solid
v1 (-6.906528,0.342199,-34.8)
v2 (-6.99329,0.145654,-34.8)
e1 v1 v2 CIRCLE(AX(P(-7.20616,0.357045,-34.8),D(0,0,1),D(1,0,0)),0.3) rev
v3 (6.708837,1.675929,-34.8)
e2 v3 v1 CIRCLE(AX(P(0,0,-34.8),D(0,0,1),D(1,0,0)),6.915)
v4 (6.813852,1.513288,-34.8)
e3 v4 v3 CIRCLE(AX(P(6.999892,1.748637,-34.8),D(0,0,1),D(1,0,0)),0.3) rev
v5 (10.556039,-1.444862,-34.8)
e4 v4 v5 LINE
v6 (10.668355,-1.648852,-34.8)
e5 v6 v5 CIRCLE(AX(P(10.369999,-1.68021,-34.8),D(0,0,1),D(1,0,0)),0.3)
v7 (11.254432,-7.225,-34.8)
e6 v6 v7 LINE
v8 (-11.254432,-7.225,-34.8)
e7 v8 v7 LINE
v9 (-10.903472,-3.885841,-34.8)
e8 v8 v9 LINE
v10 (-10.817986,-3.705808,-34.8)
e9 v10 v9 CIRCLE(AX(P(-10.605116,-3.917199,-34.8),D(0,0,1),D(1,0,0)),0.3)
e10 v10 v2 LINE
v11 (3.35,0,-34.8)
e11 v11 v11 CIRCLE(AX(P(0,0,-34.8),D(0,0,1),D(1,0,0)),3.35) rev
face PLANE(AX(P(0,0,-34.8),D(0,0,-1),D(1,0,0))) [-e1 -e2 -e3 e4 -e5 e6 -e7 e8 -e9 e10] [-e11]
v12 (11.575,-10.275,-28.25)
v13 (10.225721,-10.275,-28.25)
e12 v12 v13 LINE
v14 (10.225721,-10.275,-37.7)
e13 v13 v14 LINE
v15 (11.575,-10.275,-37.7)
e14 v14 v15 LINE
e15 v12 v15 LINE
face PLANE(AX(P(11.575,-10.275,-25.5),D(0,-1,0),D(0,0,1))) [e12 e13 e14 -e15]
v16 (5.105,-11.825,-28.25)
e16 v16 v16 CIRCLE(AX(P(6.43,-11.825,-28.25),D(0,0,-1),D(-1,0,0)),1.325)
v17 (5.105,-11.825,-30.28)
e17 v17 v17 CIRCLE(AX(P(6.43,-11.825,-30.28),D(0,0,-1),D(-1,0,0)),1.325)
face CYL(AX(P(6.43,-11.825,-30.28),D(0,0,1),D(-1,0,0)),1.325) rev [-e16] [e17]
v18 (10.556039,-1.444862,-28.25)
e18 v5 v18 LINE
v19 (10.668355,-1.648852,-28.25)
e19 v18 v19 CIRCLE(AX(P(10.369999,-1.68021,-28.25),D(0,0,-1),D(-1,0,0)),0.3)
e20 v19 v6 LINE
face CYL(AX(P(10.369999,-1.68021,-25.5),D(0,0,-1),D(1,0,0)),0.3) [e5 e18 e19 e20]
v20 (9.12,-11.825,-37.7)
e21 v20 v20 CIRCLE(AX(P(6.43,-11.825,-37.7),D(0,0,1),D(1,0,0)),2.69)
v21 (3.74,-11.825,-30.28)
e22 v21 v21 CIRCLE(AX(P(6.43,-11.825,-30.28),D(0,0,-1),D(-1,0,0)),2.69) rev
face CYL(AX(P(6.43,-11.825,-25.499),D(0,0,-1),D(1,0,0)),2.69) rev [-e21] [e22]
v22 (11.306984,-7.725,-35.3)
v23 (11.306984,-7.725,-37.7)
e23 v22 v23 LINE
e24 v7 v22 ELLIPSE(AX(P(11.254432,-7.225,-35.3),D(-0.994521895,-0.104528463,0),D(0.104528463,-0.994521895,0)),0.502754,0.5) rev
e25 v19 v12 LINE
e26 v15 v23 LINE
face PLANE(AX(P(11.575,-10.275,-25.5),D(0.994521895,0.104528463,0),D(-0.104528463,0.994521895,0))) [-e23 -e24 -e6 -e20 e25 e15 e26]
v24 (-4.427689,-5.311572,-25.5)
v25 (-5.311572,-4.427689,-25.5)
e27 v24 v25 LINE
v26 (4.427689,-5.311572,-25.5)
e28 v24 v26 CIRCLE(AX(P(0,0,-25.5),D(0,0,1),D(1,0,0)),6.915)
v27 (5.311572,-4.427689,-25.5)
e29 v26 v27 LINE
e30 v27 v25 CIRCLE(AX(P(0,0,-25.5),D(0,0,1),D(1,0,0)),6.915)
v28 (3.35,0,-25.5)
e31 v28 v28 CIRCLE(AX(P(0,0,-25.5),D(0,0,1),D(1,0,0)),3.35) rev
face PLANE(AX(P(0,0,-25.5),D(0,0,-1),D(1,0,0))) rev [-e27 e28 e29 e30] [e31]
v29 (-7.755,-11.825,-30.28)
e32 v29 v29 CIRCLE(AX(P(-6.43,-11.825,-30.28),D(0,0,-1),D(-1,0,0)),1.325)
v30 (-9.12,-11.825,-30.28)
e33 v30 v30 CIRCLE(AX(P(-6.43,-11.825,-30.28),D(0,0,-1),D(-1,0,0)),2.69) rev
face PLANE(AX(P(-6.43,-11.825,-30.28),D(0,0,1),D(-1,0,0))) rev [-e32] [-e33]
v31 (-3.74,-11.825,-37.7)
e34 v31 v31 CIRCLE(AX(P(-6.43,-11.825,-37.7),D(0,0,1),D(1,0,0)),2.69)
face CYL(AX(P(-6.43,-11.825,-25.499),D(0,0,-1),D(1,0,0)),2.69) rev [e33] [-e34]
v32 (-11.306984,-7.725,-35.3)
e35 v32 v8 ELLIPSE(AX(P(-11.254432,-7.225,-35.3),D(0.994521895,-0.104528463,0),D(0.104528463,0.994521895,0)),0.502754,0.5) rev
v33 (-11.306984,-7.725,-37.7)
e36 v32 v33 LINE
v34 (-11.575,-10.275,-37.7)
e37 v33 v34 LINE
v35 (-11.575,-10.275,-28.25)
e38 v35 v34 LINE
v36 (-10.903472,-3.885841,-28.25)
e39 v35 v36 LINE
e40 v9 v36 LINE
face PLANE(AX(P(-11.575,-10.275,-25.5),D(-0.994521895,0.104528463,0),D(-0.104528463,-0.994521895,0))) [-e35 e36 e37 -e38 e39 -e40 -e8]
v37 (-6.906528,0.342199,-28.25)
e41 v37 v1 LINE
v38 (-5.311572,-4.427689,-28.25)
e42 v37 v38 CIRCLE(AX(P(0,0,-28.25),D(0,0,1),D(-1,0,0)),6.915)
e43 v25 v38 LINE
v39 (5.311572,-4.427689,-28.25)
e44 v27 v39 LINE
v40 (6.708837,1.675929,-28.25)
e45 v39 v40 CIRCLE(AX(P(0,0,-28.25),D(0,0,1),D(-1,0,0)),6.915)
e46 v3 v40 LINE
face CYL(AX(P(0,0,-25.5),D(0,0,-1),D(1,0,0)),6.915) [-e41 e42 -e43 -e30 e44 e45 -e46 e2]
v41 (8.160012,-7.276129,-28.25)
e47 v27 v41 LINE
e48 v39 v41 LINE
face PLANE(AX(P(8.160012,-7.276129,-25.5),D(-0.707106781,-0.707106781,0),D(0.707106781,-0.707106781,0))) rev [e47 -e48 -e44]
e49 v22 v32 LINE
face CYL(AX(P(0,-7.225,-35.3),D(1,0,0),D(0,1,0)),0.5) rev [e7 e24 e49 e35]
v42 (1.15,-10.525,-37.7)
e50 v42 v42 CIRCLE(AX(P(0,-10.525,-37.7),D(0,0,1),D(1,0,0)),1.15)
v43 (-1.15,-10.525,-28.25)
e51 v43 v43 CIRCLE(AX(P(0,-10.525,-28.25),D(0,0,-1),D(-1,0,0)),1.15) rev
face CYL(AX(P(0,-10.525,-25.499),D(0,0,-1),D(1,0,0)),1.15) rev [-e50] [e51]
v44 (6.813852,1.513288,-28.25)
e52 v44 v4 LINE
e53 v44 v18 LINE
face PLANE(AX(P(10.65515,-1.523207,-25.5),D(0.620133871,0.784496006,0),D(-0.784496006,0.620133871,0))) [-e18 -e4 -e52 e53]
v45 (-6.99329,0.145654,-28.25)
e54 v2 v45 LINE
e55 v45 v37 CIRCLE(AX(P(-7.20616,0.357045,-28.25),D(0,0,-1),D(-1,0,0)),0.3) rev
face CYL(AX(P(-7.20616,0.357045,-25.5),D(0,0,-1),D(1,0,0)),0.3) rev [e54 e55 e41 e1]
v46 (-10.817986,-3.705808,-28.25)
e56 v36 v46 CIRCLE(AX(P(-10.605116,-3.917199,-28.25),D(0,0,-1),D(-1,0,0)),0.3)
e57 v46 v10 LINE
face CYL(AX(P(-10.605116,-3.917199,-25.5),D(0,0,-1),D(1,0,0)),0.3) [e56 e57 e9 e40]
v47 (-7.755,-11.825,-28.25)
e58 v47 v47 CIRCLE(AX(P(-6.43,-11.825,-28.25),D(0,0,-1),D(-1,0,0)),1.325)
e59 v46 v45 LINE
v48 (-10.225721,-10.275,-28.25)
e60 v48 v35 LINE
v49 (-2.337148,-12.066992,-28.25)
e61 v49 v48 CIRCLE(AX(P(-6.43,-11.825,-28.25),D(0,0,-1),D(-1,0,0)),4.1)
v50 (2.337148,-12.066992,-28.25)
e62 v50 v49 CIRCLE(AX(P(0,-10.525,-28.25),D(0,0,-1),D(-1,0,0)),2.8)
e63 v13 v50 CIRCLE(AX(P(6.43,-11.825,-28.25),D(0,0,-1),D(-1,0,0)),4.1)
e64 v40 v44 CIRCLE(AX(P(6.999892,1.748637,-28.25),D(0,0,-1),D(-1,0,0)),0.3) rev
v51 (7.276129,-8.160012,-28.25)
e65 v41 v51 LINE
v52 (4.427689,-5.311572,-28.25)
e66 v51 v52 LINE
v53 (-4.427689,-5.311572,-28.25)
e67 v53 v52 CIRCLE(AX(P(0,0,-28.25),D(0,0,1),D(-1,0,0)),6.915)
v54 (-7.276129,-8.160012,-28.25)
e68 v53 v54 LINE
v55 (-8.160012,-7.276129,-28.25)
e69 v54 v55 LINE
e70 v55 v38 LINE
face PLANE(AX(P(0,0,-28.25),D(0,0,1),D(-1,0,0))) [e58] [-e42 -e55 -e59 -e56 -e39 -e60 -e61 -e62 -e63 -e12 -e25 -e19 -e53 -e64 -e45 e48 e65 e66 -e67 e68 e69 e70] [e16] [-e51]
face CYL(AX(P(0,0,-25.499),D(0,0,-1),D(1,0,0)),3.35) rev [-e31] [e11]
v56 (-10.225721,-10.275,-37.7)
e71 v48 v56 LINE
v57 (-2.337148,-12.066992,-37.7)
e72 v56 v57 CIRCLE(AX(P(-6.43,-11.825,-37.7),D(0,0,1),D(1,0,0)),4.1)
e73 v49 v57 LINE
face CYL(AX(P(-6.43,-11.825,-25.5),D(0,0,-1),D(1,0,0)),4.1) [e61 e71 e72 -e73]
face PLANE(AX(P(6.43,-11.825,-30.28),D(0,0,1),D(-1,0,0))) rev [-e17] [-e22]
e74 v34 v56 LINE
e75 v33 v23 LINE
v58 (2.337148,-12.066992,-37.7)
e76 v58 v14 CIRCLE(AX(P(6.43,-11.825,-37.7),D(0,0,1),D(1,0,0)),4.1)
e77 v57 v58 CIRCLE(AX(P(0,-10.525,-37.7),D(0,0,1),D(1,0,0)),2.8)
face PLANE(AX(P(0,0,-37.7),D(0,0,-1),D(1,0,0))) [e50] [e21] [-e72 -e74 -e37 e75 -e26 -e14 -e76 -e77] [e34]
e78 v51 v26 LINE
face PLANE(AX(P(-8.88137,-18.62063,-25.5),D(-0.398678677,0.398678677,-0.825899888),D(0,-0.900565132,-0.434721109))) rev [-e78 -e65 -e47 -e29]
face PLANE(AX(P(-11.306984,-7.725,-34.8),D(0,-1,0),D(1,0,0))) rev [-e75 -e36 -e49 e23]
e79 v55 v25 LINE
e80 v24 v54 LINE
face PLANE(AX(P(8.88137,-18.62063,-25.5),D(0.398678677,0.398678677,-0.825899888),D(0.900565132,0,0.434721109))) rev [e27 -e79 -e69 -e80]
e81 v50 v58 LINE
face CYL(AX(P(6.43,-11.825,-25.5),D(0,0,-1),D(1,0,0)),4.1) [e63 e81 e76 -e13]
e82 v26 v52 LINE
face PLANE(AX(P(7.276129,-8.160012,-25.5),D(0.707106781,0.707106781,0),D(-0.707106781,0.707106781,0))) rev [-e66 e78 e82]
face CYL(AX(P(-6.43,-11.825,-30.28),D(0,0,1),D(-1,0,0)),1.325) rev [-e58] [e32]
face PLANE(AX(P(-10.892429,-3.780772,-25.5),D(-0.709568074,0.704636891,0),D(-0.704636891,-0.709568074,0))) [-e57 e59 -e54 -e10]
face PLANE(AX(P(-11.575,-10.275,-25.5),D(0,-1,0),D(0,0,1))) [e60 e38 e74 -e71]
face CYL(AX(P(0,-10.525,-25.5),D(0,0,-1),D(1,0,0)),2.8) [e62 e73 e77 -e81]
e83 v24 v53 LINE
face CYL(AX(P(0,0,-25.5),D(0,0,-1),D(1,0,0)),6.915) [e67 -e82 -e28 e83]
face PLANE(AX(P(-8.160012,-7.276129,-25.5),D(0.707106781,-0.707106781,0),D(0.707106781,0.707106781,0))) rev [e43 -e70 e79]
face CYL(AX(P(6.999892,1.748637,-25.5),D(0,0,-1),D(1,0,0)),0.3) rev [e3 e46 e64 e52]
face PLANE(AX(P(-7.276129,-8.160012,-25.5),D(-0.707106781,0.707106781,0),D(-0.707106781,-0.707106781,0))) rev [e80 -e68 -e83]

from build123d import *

# Parameters (mm, degrees)
SALIENTE_EXTRUIR1_DEPTH      = 6.7
SALIENTE_EXTRUIR1_DEPTH_BACK = 5.5
CORTAR_EXTRUIR1_REACH        = 25.161
CROQUIS3_R                   = 3.35
CROQUIS3_R_2                 = 2.69
CROQUIS3_R_3                 = 1.15
CORTAR_EXTRUIR3_START        = -2.9
CORTAR_EXTRUIR3_DEPTH        = 2.9
CORTAR_EXTRUIR4_DEPTH        = 2.75
CROQUIS7_R                   = 4.1
CROQUIS7_R_2                 = 1.325
SALIENTE_EXTRUIR2_DEPTH      = 2.03
REDONDEO3_R                  = 0.5
REDONDEO4_R                  = 0.3
REDONDEO5_START              = -2.75
REDONDEO5_DEPTH              = 6.55
REDONDEO6_R                  = 0.3
REDONDEO7_R                  = 0.3
SALIENTE_EXTRUIR3_START      = 2.75
SALIENTE_EXTRUIR3_DEPTH      = 2.75
CORTAR_EXTRUIR5_REACH        = 23.382
CORTAR_EXTRUIR6_REACH        = 23.382
CROQUIS11_W                  = 25.480274204
CROQUIS11_H                  = 24.941512188
CORTAR_EXTRUIR7_DEPTH        = 33


with BuildPart() as part:
    # Croquis2 → Saliente-Extruir1 (new, two sides: drawn at the far end of the back side and taken through both)
    with BuildSketch(Plane.XY.offset(-SALIENTE_EXTRUIR1_DEPTH_BACK)):
        with BuildLine():
            Line((11.575, -10.275), (10.225721275, -10.275))
            ThreePointArc((10.225721275, -10.275), (7.338229527, -15.823139458), (2.337147732, -12.066992374))
            ThreePointArc((2.337147732, -12.066992374), (0, -13.325), (-2.337147732, -12.066992374))
            ThreePointArc((-2.337147732, -12.066992374), (-7.338229527, -15.823139458), (-10.225721275, -10.275))
            Line((-10.225721275, -10.275), (-11.575, -10.275))
            Line((-11.575, -10.275), (-10.892429135, -3.780772023))
            Line((-10.892429135, -3.780772023), (-6.911230699, 0.228287594))
            ThreePointArc((-6.911230699, 0.228287594), (-0.680469648, 6.88143779), (6.732669496, 1.577462032))
            Line((6.732669496, 1.577462032), (10.655149523, -1.523207321))
            Line((10.655149523, -1.523207321), (11.575, -10.275))
        make_face()
    extrude(amount=SALIENTE_EXTRUIR1_DEPTH + SALIENTE_EXTRUIR1_DEPTH_BACK)

    # Croquis3 → Cortar-Extruir1 (cut, up to next)
    with BuildSketch(Plane.XY.offset(6.7), mode=Mode.PRIVATE) as cortar_extruir1_sk1:
        Circle(CROQUIS3_R)
    cortar_extruir1_tool1 = extrude(cortar_extruir1_sk1.sketch, amount=-CORTAR_EXTRUIR1_REACH, mode=Mode.PRIVATE) & part.part
    # Croquis3 → Cortar-Extruir1 (cut, up to next)
    with BuildSketch(Plane.XY.offset(6.7), mode=Mode.PRIVATE) as cortar_extruir1_sk2:
        with Locations((6.43, -11.825)):
            Circle(CROQUIS3_R_2)
    cortar_extruir1_tool2 = extrude(cortar_extruir1_sk2.sketch, amount=-CORTAR_EXTRUIR1_REACH, mode=Mode.PRIVATE) & part.part
    # Croquis3 → Cortar-Extruir1 (cut, up to next)
    with BuildSketch(Plane.XY.offset(6.7), mode=Mode.PRIVATE) as cortar_extruir1_sk3:
        with Locations((-6.43, -11.825)):
            Circle(CROQUIS3_R_2)
    cortar_extruir1_tool3 = extrude(cortar_extruir1_sk3.sketch, amount=-CORTAR_EXTRUIR1_REACH, mode=Mode.PRIVATE) & part.part
    # Croquis3 → Cortar-Extruir1 (cut, up to next)
    with BuildSketch(Plane.XY.offset(6.7), mode=Mode.PRIVATE) as cortar_extruir1_sk4:
        with Locations((0, -10.525)):
            Circle(CROQUIS3_R_3)
    cortar_extruir1_tool4 = extrude(cortar_extruir1_sk4.sketch, amount=-CORTAR_EXTRUIR1_REACH, mode=Mode.PRIVATE) & part.part
    add(cortar_extruir1_tool1.solids().sort_by_distance((0, 0, 6.7))[0], mode=Mode.SUBTRACT)
    add(cortar_extruir1_tool2.solids().sort_by_distance((6.43, -11.825, 6.7))[0], mode=Mode.SUBTRACT)
    add(cortar_extruir1_tool3.solids().sort_by_distance((-6.43, -11.825, 6.7))[0], mode=Mode.SUBTRACT)
    add(cortar_extruir1_tool4.solids().sort_by_distance((0, -10.525, 6.7))[0], mode=Mode.SUBTRACT)

    # Croquis4 → Cortar-Extruir3 (cut)
    with BuildSketch(Plane.XY.offset(6.7).offset(CORTAR_EXTRUIR3_START)):
        with BuildLine():
            Line((-11.3069842, -7.725), (11.3069842, -7.725))
            Line((11.3069842, -7.725), (10.655149523, -1.523207321))
            Line((10.655149523, -1.523207321), (6.732669496, 1.577462032))
            ThreePointArc((6.732669496, 1.577462032), (-0.680469648, 6.88143779), (-6.911230699, 0.228287594))
            Line((-6.911230699, 0.228287594), (-10.892429135, -3.780772023))
            Line((-10.892429135, -3.780772023), (-11.3069842, -7.725))
        make_face()
    extrude(amount=CORTAR_EXTRUIR3_DEPTH, mode=Mode.SUBTRACT)

    # Croquis6 → Cortar-Extruir4 (cut)
    with BuildSketch(Plane(origin=(0, 0, -5.5), x_dir=(-1, 0, 0), z_dir=(0, 0, -1))):
        with BuildLine():
            Line((-11.575, -10.275), (-11.3069842, -7.725))
            Line((-11.3069842, -7.725), (-10.655149523, -1.523207321))
            Line((-10.655149523, -1.523207321), (-6.732669496, 1.577462032))
            ThreePointArc((-6.732669496, 1.577462032), (-0.680469648, -6.88143779), (6.911230699, 0.228287594))
            Line((6.911230699, 0.228287594), (10.892429135, -3.780772023))
            Line((10.892429135, -3.780772023), (11.3069842, -7.725))
            Line((11.3069842, -7.725), (11.575, -10.275))
            Line((11.575, -10.275), (10.225721275, -10.275))
            ThreePointArc((10.225721275, -10.275), (7.338229527, -15.823139458), (2.337147732, -12.066992374))
            ThreePointArc((2.337147732, -12.066992374), (0, -13.325), (-2.337147732, -12.066992374))
            ThreePointArc((-2.337147732, -12.066992374), (-7.338229527, -15.823139458), (-10.225721275, -10.275))
            Line((-10.225721275, -10.275), (-11.575, -10.275))
        make_face()
    extrude(amount=-CORTAR_EXTRUIR4_DEPTH, mode=Mode.SUBTRACT)

    # Croquis7 → Saliente-Extruir2 (add)
    # profile 1 of 2: a face of its own
    with BuildSketch(Plane(origin=(0, 0, -2.75), x_dir=(-1, 0, 0), z_dir=(0, 0, -1))):
        with Locations((-6.43, -11.825)):
            Circle(CROQUIS7_R)
        with Locations((-6.43, -11.825)):
            Circle(CROQUIS7_R_2, mode=Mode.SUBTRACT)
    # profile 2 of 2: a face of its own
    with BuildSketch(Plane(origin=(0, 0, -2.75), x_dir=(-1, 0, 0), z_dir=(0, 0, -1))):
        with Locations((6.43, -11.825)):
            Circle(CROQUIS7_R)
        with Locations((6.43, -11.825)):
            Circle(CROQUIS7_R_2, mode=Mode.SUBTRACT)
    extrude(amount=-SALIENTE_EXTRUIR2_DEPTH)

    # Redondeo3
    redondeo3_edges = [part.edges().sort_by_distance(p)[0] for p in [
        (0, -7.725, 3.8),
    ]]
    fillet(redondeo3_edges, radius=REDONDEO3_R)

    # Redondeo4
    redondeo4_edges = [part.edges().sort_by_distance(p)[0] for p in [
        (10.655149523, -1.523207321, 0.525),
    ]]
    fillet(redondeo4_edges, radius=REDONDEO4_R)

    # Redondeo5: read off the stored shape, not the designer's step
    # Redondeo5 outline → Redondeo5 (add)
    with BuildSketch(Plane.XY.offset(REDONDEO5_START)):
        with BuildLine():
            ThreePointArc((6.813852263, 1.513288112), (6.747864412, 1.585904369), (6.708836606, 1.675928518))
            ThreePointArc((6.708836606, 1.675928518), (6.720933379, 1.626738922), (6.732669496, 1.577462032))
            Line((6.732669496, 1.577462032), (6.813852263, 1.513288112))
        make_face()
    extrude(amount=REDONDEO5_DEPTH)

    # Redondeo6
    redondeo6_edges = [part.edges().sort_by_distance(p)[0] for p in [
        (-10.892429135, -3.780772023, 0.525),
    ]]
    fillet(redondeo6_edges, radius=REDONDEO6_R)

    # Redondeo7
    # the kernel refuses this fillet: 0.3 mm, written as the material it adds along each edge
    with BuildSketch(Plane(origin=(-6.911230699, 0.228287594, -2.75), x_dir=(-0.7046368913074451, -0.7095680738368798, 0), z_dir=(0, 0, 1))) as redondeo7_piece_1:
        with BuildLine():
            CenterArc((0.116455714, -0.3), REDONDEO7_R, 90, 41.963687937)
            ThreePointArc((-0.084142134, -0.076929376), (-0.041912521, -0.038638099), (0, 0))
            Line((0, 0), (0.116455714, 0))
        make_face()
    extrude(amount=6.55)

    # Croquis8 → Saliente-Extruir3 (add)
    with BuildSketch(Plane(origin=(0, 0, -2.75), x_dir=(-1, 0, 0), z_dir=(0, 0, -1)).offset(SALIENTE_EXTRUIR3_START)):
        with BuildLine():
            Line((7.718070517, -7.718070517), (7.276128778, -8.160012255))
            Line((7.276128778, -8.160012255), (4.427688638, -5.311572114))
            ThreePointArc((4.427688638, -5.311572114), (4.889643392, -4.889643392), (5.311572114, -4.427688638))
            Line((5.311572114, -4.427688638), (8.160012255, -7.276128778))
            Line((8.160012255, -7.276128778), (7.718070517, -7.718070517))
        make_face()
        with BuildLine():
            Line((-7.718070517, -7.718070517), (-7.276128778, -8.160012255))
            Line((-7.276128778, -8.160012255), (-4.427688638, -5.311572114))
            ThreePointArc((-4.427688638, -5.311572114), (-4.889643392, -4.889643392), (-5.311572114, -4.427688638))
            Line((-5.311572114, -4.427688638), (-8.160012255, -7.276128778))
            Line((-8.160012255, -7.276128778), (-7.718070517, -7.718070517))
        make_face()
    extrude(amount=-SALIENTE_EXTRUIR3_DEPTH)

    # Croquis9 → Cortar-Extruir5 (cut, up to next)
    with BuildSketch(Plane(origin=(-0.441941738, 0.441941738, 0), x_dir=(0, 0, 1), z_dir=(-0.7071067811865471, 0.7071067811865479, 0)), mode=Mode.PRIVATE) as cortar_extruir5_sk1:
        Polygon((-5.5, -6.886697322), (-2.75, -10.915), (-5.5, -10.915), align=None)
    cortar_extruir5_tool1 = extrude(cortar_extruir5_sk1.sketch, amount=-CORTAR_EXTRUIR5_REACH, mode=Mode.PRIVATE) & part.part
    add(cortar_extruir5_tool1.solids().sort_by_distance((-7.210532, -6.326649, -4.583333))[0], mode=Mode.SUBTRACT)

    # Croquis10 → Cortar-Extruir6 (cut, up to next)
    with BuildSketch(Plane(origin=(0.441941738, 0.441941738, 0), x_dir=(0, 0, -1), z_dir=(0.7071067811865479, 0.7071067811865472, 0)), mode=Mode.PRIVATE) as cortar_extruir6_sk1:
        Polygon((2.75, -10.915), (5.5, -10.915), (5.5, -6.886697322), align=None)
    cortar_extruir6_tool1 = extrude(cortar_extruir6_sk1.sketch, amount=-CORTAR_EXTRUIR6_REACH, mode=Mode.PRIVATE) & part.part
    add(cortar_extruir6_tool1.solids().sort_by_distance((7.210532, -6.326649, -4.583333))[0], mode=Mode.SUBTRACT)


with BuildPart() as body_2:
    # Simetría5: mirrored copy
    add(part.part.mirror(Plane(origin=(0, 0, -15.5), x_dir=(1, 0, 0), z_dir=(0, 0, -1))))


with BuildPart() as part_1:
    add(part.part)

    # Croquis11 → Cortar-Extruir7 (cut)
    with BuildSketch(Plane(origin=(0, 0, -15.5), x_dir=(-1, 0, 0), z_dir=(0, 0, -1))):
        with Locations((-0.09507565, -4.82477955)):
            Rectangle(CROQUIS11_W, CROQUIS11_H)
    extrude(amount=-CORTAR_EXTRUIR7_DEPTH, mode=Mode.SUBTRACT)


solid = body_2.part
